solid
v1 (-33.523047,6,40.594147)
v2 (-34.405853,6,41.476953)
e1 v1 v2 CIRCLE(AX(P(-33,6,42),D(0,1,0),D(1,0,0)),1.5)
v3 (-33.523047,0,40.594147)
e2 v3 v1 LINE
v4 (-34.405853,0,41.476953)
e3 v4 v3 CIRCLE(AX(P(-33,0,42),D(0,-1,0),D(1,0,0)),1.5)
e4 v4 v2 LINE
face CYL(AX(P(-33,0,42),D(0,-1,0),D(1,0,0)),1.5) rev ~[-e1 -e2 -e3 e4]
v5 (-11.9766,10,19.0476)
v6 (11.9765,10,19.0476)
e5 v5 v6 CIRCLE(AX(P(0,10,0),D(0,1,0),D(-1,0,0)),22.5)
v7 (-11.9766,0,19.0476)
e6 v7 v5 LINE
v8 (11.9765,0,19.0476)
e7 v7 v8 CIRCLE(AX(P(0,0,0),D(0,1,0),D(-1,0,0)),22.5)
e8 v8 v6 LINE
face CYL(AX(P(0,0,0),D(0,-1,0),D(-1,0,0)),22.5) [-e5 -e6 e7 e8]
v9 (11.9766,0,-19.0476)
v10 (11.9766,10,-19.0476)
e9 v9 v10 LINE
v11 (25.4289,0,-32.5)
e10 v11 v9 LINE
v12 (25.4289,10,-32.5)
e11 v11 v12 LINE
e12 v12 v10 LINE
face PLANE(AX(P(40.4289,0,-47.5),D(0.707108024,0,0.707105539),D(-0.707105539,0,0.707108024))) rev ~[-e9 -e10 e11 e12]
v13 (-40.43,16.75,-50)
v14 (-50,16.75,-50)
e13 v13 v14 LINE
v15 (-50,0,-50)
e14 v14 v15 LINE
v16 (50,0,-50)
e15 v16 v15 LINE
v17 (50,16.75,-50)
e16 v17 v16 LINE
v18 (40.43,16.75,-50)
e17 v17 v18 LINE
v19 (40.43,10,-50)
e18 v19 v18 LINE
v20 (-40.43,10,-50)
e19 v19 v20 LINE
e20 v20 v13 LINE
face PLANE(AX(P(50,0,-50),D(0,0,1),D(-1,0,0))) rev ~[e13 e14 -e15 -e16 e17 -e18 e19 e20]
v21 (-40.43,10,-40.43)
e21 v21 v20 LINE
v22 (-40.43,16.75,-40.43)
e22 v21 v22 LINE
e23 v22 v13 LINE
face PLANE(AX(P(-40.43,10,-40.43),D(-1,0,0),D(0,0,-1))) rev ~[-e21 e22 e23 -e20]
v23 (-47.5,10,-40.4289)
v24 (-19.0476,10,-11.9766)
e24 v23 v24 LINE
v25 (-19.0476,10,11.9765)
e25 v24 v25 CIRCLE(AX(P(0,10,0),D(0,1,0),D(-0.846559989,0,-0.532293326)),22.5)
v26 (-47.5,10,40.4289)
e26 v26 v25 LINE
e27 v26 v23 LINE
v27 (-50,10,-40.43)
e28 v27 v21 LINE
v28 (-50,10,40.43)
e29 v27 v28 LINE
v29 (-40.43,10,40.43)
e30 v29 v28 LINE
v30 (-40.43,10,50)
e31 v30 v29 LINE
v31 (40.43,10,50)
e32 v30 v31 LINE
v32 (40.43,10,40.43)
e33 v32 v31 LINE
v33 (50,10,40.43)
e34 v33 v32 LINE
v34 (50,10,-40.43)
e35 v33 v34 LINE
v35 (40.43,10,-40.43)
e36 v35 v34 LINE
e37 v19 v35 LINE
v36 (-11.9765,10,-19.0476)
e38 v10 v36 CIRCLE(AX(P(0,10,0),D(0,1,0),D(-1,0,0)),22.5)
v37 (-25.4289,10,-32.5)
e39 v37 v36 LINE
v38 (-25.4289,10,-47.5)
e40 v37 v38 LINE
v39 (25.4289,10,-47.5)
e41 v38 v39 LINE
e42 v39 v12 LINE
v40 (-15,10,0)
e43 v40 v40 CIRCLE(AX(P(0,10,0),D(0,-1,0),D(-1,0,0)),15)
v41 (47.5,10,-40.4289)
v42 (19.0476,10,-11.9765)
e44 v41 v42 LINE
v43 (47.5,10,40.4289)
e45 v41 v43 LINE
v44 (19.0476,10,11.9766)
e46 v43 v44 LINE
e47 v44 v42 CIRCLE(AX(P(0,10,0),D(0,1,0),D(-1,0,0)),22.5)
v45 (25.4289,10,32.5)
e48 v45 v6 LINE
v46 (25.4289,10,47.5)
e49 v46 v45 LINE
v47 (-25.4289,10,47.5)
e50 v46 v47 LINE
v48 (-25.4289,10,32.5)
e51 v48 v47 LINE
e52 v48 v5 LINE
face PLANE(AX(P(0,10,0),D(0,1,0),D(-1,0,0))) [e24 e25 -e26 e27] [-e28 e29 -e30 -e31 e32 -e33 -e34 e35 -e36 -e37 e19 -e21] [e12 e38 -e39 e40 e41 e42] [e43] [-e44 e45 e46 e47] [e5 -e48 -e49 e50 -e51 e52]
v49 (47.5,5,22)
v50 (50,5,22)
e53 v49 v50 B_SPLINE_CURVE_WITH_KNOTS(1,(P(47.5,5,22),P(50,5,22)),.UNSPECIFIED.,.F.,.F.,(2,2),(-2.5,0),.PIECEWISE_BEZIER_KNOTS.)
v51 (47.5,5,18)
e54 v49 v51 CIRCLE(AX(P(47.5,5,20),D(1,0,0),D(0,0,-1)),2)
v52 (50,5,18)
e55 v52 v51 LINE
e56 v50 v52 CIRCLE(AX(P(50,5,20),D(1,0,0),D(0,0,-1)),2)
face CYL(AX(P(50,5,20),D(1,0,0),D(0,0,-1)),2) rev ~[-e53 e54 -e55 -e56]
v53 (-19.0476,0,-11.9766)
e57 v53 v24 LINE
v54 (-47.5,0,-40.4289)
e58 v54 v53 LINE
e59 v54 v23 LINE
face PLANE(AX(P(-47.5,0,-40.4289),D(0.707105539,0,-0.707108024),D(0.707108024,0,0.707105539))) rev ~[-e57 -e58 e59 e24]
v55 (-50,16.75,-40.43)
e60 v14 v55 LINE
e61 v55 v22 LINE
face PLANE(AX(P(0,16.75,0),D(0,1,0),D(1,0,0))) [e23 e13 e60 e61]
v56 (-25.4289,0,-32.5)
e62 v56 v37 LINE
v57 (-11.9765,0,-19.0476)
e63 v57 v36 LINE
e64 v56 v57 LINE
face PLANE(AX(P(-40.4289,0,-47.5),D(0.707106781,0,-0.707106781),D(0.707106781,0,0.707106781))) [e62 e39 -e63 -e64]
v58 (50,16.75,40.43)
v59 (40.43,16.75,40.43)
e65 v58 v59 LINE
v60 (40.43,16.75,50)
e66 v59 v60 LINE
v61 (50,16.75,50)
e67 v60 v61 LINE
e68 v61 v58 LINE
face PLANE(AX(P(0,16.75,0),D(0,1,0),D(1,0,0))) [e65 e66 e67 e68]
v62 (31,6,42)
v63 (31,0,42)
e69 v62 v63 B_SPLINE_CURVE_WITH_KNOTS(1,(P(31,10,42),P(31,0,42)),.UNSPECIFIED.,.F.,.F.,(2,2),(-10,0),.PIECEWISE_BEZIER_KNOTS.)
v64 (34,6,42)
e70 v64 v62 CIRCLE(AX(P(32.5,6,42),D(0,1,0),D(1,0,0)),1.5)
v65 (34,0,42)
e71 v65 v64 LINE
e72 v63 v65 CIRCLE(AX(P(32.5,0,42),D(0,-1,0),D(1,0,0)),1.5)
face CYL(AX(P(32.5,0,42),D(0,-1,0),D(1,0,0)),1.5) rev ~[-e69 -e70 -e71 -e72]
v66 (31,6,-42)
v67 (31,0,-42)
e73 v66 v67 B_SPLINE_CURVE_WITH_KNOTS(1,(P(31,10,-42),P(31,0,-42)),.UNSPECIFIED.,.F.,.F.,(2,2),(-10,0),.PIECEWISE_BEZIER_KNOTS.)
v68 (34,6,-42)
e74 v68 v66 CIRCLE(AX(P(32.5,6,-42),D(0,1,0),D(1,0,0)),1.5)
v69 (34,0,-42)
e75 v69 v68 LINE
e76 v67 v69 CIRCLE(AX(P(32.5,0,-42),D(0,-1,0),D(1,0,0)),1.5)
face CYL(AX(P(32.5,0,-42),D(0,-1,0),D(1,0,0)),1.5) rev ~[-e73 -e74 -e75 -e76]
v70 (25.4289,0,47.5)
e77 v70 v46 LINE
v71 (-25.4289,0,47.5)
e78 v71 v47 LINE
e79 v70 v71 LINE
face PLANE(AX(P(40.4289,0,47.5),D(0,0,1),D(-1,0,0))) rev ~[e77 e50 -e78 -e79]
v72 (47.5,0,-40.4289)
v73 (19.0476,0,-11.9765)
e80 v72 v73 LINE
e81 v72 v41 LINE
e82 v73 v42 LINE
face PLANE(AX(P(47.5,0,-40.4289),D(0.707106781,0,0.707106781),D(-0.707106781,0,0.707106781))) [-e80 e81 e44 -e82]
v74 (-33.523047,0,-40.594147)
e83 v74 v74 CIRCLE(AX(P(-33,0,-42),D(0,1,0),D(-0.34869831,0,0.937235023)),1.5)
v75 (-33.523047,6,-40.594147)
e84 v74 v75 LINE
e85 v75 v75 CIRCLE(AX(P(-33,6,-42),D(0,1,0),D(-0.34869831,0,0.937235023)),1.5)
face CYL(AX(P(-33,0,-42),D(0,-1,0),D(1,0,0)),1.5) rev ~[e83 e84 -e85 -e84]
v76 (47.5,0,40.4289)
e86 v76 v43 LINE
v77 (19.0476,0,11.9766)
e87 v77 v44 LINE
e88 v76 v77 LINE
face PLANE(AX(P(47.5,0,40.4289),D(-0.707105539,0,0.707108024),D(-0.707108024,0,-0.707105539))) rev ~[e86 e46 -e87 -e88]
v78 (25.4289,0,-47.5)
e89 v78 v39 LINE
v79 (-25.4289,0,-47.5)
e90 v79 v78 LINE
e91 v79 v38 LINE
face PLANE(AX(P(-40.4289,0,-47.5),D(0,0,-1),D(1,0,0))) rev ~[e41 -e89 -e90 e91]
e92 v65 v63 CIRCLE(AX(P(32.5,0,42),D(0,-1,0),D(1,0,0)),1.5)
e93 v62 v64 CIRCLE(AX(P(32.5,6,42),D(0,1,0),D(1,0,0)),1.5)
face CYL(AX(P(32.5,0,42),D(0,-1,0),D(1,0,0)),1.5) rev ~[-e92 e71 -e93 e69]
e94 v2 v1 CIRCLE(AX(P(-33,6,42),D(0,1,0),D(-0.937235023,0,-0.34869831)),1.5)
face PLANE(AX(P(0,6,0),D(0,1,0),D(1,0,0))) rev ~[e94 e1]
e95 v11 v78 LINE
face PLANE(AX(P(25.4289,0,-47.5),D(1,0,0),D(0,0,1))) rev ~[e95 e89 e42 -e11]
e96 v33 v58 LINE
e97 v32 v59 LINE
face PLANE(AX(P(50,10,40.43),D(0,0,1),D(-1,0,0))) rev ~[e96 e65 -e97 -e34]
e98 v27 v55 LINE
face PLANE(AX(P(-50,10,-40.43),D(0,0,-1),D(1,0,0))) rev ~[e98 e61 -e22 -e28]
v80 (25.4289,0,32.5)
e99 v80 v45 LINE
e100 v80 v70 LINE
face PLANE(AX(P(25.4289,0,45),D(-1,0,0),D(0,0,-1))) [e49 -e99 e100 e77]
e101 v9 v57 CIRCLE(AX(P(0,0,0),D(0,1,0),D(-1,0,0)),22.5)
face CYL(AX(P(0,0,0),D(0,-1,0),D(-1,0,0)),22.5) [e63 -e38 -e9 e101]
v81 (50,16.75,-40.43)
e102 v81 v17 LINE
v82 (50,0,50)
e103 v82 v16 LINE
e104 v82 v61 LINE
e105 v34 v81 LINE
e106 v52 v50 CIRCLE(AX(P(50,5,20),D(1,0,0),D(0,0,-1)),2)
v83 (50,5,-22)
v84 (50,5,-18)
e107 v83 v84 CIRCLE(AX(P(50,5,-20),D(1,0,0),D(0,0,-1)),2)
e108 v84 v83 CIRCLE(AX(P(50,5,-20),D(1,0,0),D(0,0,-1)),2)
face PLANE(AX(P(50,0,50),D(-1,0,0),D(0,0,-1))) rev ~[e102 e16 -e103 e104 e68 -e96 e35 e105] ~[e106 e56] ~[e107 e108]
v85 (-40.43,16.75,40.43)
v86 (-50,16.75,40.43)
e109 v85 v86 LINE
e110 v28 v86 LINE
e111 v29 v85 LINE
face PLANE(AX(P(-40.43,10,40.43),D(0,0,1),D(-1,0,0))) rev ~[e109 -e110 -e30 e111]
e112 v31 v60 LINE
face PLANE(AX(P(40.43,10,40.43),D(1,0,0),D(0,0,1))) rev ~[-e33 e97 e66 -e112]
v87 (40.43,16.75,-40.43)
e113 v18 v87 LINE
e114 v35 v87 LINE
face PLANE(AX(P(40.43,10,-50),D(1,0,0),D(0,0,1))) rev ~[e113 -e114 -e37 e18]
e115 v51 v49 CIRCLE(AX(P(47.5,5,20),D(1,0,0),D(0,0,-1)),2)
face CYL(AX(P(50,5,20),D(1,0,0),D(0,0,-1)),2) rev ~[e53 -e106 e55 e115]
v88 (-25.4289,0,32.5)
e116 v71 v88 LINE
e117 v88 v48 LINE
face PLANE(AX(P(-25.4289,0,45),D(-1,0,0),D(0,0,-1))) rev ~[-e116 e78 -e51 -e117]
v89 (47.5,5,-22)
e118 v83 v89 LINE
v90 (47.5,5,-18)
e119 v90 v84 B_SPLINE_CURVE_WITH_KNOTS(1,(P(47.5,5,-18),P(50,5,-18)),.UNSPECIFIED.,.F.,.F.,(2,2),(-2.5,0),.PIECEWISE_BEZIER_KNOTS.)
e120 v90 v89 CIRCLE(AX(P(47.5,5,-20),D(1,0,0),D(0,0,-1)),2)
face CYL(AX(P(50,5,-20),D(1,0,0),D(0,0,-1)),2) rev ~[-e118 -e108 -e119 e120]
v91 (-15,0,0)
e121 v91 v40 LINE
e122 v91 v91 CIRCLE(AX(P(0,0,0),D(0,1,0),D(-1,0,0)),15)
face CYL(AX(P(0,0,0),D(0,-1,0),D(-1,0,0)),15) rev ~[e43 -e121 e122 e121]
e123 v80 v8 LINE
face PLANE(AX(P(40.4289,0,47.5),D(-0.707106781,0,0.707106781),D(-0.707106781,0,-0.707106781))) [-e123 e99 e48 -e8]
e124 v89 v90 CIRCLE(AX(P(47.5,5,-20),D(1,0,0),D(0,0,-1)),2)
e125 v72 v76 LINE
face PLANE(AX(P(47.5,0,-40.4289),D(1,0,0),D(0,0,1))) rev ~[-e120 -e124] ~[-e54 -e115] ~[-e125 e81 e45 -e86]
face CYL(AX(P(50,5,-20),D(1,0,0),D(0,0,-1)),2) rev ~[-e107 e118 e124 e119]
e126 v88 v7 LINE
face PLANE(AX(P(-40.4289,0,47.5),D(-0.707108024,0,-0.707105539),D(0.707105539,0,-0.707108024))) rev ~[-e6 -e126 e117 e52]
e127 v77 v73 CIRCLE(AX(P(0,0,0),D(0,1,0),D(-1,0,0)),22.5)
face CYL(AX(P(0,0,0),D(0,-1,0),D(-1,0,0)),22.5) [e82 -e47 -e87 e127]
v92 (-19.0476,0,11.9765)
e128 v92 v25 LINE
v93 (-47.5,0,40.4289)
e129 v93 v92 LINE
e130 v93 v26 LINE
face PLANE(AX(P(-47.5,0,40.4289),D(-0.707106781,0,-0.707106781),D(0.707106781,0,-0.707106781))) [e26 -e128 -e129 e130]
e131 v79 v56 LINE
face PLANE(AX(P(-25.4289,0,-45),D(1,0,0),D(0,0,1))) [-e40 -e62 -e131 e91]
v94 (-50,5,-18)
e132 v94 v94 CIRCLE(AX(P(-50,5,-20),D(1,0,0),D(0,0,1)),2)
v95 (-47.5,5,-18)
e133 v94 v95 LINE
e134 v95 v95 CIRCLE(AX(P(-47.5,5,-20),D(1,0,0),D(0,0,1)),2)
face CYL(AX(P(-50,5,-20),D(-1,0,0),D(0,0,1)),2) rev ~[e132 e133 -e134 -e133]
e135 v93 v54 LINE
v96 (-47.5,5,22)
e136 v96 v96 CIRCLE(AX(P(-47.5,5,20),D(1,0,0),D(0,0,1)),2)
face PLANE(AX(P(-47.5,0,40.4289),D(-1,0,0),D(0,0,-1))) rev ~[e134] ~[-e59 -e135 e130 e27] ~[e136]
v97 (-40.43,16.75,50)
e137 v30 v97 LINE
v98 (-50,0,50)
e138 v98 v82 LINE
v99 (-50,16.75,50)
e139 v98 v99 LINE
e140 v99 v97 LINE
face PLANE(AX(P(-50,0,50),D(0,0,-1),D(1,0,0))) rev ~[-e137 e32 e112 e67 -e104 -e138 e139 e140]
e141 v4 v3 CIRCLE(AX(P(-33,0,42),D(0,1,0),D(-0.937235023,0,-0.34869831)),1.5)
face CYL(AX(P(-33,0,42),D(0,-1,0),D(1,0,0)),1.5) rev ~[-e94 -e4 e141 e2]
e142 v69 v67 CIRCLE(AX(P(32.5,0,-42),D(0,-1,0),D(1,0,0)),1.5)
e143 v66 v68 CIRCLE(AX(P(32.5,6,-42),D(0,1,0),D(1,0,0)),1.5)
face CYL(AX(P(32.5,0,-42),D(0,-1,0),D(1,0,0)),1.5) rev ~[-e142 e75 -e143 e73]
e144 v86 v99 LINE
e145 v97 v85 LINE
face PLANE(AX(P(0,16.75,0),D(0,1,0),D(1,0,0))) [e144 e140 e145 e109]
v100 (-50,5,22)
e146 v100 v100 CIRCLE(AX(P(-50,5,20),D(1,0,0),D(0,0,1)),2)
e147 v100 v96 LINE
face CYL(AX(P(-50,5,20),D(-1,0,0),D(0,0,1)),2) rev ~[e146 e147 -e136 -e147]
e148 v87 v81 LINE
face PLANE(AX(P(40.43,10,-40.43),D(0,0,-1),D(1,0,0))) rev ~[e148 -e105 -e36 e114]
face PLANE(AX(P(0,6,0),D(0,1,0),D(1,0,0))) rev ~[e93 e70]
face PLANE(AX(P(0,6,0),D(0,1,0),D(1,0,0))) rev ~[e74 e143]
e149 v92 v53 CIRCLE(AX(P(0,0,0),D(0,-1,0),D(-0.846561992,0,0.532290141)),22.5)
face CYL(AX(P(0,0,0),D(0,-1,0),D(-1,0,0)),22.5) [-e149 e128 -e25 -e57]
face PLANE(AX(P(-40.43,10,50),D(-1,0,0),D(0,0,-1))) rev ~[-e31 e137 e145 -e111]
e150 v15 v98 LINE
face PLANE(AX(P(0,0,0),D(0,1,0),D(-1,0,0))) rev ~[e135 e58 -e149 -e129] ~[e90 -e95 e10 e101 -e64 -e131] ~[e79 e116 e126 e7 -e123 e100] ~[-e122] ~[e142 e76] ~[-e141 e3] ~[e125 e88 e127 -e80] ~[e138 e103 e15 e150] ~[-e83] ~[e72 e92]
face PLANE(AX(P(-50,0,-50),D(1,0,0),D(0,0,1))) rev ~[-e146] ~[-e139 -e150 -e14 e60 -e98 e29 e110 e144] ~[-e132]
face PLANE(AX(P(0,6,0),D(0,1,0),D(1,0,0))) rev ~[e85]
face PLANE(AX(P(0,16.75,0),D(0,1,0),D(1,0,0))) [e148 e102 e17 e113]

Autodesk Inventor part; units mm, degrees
ref_plane "YZ Plane" through (0, 0, 0) normal (1, 0, 0) x (0, 1, 0)
ref_plane "XZ Plane" through (0, 0, 0) normal (0, 1, 0) x (-1, 0, 0)
ref_plane "XY Plane" through (0, 0, 0) normal (0, 0, 1) x (1, 0, 0)
sketch "Sketch1" plane through (0, 0, 0) normal (0, 1, 0) x (-1, 0, 0)
  line L0 (50, 50) -> (-50, 50)
  line L1 (-50, 50) -> (-50, -50)
  line L2 (-50, -50) -> (50, -50)
  line L3 (50, -50) -> (50, 50)
  line L4 (-50, 50) -> (50, -50) construction
  line L5 (-47.5, 47.5) -> (47.5, 47.5)
  line L6 (47.5, 47.5) -> (47.5, -47.5)
  line L7 (47.5, -47.5) -> (-47.5, -47.5)
  line L8 (-47.5, -47.5) -> (-47.5, 47.5)
  line L9 (-47.5, 47.5) -> (47.5, -47.5) construction
  circle A0 centre (0, 0) radius 22.5
  circle A1 centre (0, 0) radius 15
  line L10 (40.4289, 47.5) -> (11.9766, 19.0476)
  line L11 (47.5, 40.4289) -> (19.0476, 11.9765)
  line L12 (-47.5, 40.4289) -> (-19.0476, 11.9766)
  line L13 (-40.4289, 47.5) -> (-11.9765, 19.0476)
  line L14 (-40.4289, -47.5) -> (-11.9766, -19.0476)
  line L15 (-47.5, -40.4289) -> (-19.0476, -11.9765)
  line L16 (47.5, -40.4289) -> (19.0476, -11.9766)
  line L17 (40.4289, -47.5) -> (11.9765, -19.0476)
  circle A2 centre (35, -35) radius 2
  circle A3 centre (35, 35) radius 2
  circle A4 centre (-35, 35) radius 2
  circle A5 centre (-35, -35) radius 2
  point P0 (19.0476, -11.9766)
  point P1 (-11.9765, 19.0476)
  point P2 (-11.9766, -19.0476)
  point P3 (11.9765, -19.0476)
  dimension "d0" = 100
  dimension "d1" = 100
  dimension "d2" = 95
  dimension "d3" = 95
  dimension "d9" = 30
  dimension "d10" = 7.5
  dimension "d11" = 10
  dimension "d12" = 7.0711
  dimension "d13" = 7.0711
  dimension "d16" = 360
  dimension "d23" = 4
  dimension "d24" = 35
  dimension "d27" = 360
extrude "Extrusion1" add sketch "Sketch1" along normal blind 10 contours L3 L2 L1 L0 | L5 L13 A0 L12 L8 | L5 L6 L11 A0 L10 | A0 | L15 A0 L14 L7 L8 | L6 L7 L17 A0 L16 | A2 | A3 | A4 | A5
sketch "Sketch3" plane through (0, 10, 0) normal (0, 1, 0) x (1, 0, 0)
  line L0 (-50, -50) -> (-40.43, -50)
  line L1 (-40.43, -50) -> (-40.43, -40.43)
  line L2 (-40.43, -40.43) -> (-50, -40.43)
  line L3 (-50, -40.43) -> (-50, -50)
  line L4 (40.43, -40.43) -> (40.43, -50)
  line L5 (40.43, -50) -> (50, -50)
  line L6 (50, -40.43) -> (40.43, -40.43)
  line L7 (50, -50) -> (50, -40.43)
  line L8 (40.43, 40.43) -> (50, 40.43)
  line L9 (50, 40.43) -> (50, 50)
  line L10 (40.43, 50) -> (40.43, 40.43)
  line L11 (50, 50) -> (40.43, 50)
  line L12 (-40.43, 40.43) -> (-40.43, 50)
  line L13 (-40.43, 50) -> (-50, 50)
  line L14 (-50, 40.43) -> (-40.43, 40.43)
  line L15 (-50, 50) -> (-50, 40.43)
  point P0 (0, 0)
  dimension "d29" = 9.57
  dimension "d30" = 9.57
  dimension "d33" = 360
extrude "Extrusion2" add sketch "Sketch3" along normal blind 6.75
sketch "Sketch4" plane through (-50, 0, -50) normal (-1, 0, 0) x (0, 0, 1)
  circle A0 centre (30, 5) radius 2
  line L0 (0, 0) -> (0, 16.75) projected
  circle A1 centre (70, 5) radius 2
  line L1 (100, 0) -> (100, 16.75) projected
  point P0 (50, 0)
  dimension "d37" = 4
  dimension "d38" = 30
  dimension "d39" = 4
  dimension "d40" = 30
extrude "Extrusion3" cut sketch "Sketch4" against normal blind 6.75
sketch "Sketch5" plane through (50, 0, 50) normal (1, 0, 0) x (0, 0, -1)
  circle A0 centre (30, 5) radius 2
  line L0 (0, 0) -> (0, 16.75) projected
  circle A1 centre (70, 5) radius 2
  line L1 (100, 0) -> (100, 16.75) projected
  point P0 (50, 0)
  dimension "d43" = 4
  dimension "d44" = 30
  dimension "d45" = 4
  dimension "d46" = 30
extrude "Extrusion4" cut sketch "Sketch5" against normal blind 6.75
sketch "Sketch6" plane through (0, 0, 0) normal (0, -1, 0) x (1, 0, 0)
  line L0 (35, 45) -> (-35, 45)
  line L1 (-35, 45) -> (-35, -45)
  line L2 (-35, -45) -> (35, -45)
  line L3 (35, -45) -> (35, 45)
  line L4 (35, 45) -> (-35, -45) construction
  line L5 (-35, 45) -> (35, -45) construction
  line L6 (40.4289, 47.5) -> (25.4289, 47.5)
  line L7 (40.4289, 47.5) -> (-40.4289, 47.5) projected
  line L8 (25.4289, 47.5) -> (25.4289, 32.5)
  line L9 (25.4289, 32.5) -> (40.4289, 47.5)
  line L10 (40.4289, -47.5) -> (11.9766, -19.0476) projected
  line L11 (40.4289, -47.5) -> (25.4289, -47.5)
  line L12 (-40.4289, -47.5) -> (40.4289, -47.5) projected
  line L13 (-40.4289, 47.5) -> (-25.4289, 47.5)
  line L14 (-40.4289, -47.5) -> (-25.4289, -47.5)
  circle A0 centre (32.5, 42) radius 1.5
  circle A1 centre (32.5, -42) radius 1.5
  circle A2 centre (-33, -42) radius 1.5
  circle A3 centre (-33, 42) radius 1.5
  line L15 (-40.4289, -47.5) -> (-25.4289, -47.5)
  line L16 (-25.4289, -47.5) -> (-25.4289, -32.5)
  line L17 (-25.4289, -32.5) -> (-40.4289, -47.5)
  line L18 (-40.4289, 47.5) -> (-25.4289, 47.5)
  line L19 (-40.4289, 47.5) -> (-25.4289, 47.5)
  line L20 (-40.4289, 47.5) -> (-25.4289, 47.5) construction
  line L21 (-25.4289, 47.5) -> (-25.4289, 32.5)
  line L22 (-25.4289, 32.5) -> (-40.4289, 47.5)
  line L23 (25.4289, -47.5) -> (25.4289, -32.5)
  line L24 (25.4289, -47.5) -> (40.4289, -47.5) construction
  line L25 (25.4289, -32.5) -> (40.4289, -47.5)
  point P0 (0, 0)
  point P1 (-34.4058, -41.4769)
  point P2 (-33.5231, -40.5942)
  point P3 (-33.5231, 40.5942)
  point P4 (-34.4058, 41.4769)
  dimension "d49" = 70
  dimension "d50" = 90
  dimension "d51" = 15
  dimension "d52" = 15
  dimension "d53" = 90
  dimension "d54" = 15
  dimension "d56" = 15
  dimension "d58" = 15
  dimension "d59" = 3
  dimension "d60" = 2.5
  dimension "d61" = 3
  dimension "d62" = 3
  dimension "d63" = 3
  dimension "d64" = 2.5
  dimension "d65" = 3
  dimension "d66" = 3
  dimension "d67" = 2
  dimension "d68" = 3
  dimension "d69" = 3
  dimension "d70" = 2
  dimension "d71" = 15
  dimension "d72" = 15
  dimension "d73" = 0
  dimension "d74" = 15
  dimension "d75" = 90
  dimension "d76" = 15
  dimension "d77" = 90
extrude "Extrusion5" cut sketch "Sketch6" against normal blind 10 contours A3 L22 | A2 L17 picked at (-33.9131, 40.9363) picked at (-33.9131, -40.9363)
extrude "Extrusion6" add sketch "Sketch6" against normal blind 10 contours L3 L9 L8 L0 | L0 L8 L6 L9 L3 | L21 L22 A3 L1 L0 | L0 L1 L22 L7 L21 | L10 L11 L23 L2 L3 | L3 L2 L23 L10 | L17 A2 L16 L2 L1 | L1 L2 L16 L12 L17
sketch "Sketch8" plane through (0, 10, 0) normal (0, 1, 0) x (1, 0, 0)
  circle A0 centre (-33, 42) radius 1.5 projected
  circle A1 centre (-33, 42) radius 1.5
  circle A2 centre (32.5, 42) radius 1.5 projected
  circle A3 centre (32.5, 42) radius 1.5
  circle A4 centre (32.5, -42) radius 1.5 projected
  circle A5 centre (32.5, -42) radius 1.5
  circle A6 centre (-33, -42) radius 1.5
  point P0 (0, 0)
extrude "Extrusion7" add sketch "Sketch8" against normal blind 4
equation "\"d18\" = d11"
properties part number "Top&Bottom"
